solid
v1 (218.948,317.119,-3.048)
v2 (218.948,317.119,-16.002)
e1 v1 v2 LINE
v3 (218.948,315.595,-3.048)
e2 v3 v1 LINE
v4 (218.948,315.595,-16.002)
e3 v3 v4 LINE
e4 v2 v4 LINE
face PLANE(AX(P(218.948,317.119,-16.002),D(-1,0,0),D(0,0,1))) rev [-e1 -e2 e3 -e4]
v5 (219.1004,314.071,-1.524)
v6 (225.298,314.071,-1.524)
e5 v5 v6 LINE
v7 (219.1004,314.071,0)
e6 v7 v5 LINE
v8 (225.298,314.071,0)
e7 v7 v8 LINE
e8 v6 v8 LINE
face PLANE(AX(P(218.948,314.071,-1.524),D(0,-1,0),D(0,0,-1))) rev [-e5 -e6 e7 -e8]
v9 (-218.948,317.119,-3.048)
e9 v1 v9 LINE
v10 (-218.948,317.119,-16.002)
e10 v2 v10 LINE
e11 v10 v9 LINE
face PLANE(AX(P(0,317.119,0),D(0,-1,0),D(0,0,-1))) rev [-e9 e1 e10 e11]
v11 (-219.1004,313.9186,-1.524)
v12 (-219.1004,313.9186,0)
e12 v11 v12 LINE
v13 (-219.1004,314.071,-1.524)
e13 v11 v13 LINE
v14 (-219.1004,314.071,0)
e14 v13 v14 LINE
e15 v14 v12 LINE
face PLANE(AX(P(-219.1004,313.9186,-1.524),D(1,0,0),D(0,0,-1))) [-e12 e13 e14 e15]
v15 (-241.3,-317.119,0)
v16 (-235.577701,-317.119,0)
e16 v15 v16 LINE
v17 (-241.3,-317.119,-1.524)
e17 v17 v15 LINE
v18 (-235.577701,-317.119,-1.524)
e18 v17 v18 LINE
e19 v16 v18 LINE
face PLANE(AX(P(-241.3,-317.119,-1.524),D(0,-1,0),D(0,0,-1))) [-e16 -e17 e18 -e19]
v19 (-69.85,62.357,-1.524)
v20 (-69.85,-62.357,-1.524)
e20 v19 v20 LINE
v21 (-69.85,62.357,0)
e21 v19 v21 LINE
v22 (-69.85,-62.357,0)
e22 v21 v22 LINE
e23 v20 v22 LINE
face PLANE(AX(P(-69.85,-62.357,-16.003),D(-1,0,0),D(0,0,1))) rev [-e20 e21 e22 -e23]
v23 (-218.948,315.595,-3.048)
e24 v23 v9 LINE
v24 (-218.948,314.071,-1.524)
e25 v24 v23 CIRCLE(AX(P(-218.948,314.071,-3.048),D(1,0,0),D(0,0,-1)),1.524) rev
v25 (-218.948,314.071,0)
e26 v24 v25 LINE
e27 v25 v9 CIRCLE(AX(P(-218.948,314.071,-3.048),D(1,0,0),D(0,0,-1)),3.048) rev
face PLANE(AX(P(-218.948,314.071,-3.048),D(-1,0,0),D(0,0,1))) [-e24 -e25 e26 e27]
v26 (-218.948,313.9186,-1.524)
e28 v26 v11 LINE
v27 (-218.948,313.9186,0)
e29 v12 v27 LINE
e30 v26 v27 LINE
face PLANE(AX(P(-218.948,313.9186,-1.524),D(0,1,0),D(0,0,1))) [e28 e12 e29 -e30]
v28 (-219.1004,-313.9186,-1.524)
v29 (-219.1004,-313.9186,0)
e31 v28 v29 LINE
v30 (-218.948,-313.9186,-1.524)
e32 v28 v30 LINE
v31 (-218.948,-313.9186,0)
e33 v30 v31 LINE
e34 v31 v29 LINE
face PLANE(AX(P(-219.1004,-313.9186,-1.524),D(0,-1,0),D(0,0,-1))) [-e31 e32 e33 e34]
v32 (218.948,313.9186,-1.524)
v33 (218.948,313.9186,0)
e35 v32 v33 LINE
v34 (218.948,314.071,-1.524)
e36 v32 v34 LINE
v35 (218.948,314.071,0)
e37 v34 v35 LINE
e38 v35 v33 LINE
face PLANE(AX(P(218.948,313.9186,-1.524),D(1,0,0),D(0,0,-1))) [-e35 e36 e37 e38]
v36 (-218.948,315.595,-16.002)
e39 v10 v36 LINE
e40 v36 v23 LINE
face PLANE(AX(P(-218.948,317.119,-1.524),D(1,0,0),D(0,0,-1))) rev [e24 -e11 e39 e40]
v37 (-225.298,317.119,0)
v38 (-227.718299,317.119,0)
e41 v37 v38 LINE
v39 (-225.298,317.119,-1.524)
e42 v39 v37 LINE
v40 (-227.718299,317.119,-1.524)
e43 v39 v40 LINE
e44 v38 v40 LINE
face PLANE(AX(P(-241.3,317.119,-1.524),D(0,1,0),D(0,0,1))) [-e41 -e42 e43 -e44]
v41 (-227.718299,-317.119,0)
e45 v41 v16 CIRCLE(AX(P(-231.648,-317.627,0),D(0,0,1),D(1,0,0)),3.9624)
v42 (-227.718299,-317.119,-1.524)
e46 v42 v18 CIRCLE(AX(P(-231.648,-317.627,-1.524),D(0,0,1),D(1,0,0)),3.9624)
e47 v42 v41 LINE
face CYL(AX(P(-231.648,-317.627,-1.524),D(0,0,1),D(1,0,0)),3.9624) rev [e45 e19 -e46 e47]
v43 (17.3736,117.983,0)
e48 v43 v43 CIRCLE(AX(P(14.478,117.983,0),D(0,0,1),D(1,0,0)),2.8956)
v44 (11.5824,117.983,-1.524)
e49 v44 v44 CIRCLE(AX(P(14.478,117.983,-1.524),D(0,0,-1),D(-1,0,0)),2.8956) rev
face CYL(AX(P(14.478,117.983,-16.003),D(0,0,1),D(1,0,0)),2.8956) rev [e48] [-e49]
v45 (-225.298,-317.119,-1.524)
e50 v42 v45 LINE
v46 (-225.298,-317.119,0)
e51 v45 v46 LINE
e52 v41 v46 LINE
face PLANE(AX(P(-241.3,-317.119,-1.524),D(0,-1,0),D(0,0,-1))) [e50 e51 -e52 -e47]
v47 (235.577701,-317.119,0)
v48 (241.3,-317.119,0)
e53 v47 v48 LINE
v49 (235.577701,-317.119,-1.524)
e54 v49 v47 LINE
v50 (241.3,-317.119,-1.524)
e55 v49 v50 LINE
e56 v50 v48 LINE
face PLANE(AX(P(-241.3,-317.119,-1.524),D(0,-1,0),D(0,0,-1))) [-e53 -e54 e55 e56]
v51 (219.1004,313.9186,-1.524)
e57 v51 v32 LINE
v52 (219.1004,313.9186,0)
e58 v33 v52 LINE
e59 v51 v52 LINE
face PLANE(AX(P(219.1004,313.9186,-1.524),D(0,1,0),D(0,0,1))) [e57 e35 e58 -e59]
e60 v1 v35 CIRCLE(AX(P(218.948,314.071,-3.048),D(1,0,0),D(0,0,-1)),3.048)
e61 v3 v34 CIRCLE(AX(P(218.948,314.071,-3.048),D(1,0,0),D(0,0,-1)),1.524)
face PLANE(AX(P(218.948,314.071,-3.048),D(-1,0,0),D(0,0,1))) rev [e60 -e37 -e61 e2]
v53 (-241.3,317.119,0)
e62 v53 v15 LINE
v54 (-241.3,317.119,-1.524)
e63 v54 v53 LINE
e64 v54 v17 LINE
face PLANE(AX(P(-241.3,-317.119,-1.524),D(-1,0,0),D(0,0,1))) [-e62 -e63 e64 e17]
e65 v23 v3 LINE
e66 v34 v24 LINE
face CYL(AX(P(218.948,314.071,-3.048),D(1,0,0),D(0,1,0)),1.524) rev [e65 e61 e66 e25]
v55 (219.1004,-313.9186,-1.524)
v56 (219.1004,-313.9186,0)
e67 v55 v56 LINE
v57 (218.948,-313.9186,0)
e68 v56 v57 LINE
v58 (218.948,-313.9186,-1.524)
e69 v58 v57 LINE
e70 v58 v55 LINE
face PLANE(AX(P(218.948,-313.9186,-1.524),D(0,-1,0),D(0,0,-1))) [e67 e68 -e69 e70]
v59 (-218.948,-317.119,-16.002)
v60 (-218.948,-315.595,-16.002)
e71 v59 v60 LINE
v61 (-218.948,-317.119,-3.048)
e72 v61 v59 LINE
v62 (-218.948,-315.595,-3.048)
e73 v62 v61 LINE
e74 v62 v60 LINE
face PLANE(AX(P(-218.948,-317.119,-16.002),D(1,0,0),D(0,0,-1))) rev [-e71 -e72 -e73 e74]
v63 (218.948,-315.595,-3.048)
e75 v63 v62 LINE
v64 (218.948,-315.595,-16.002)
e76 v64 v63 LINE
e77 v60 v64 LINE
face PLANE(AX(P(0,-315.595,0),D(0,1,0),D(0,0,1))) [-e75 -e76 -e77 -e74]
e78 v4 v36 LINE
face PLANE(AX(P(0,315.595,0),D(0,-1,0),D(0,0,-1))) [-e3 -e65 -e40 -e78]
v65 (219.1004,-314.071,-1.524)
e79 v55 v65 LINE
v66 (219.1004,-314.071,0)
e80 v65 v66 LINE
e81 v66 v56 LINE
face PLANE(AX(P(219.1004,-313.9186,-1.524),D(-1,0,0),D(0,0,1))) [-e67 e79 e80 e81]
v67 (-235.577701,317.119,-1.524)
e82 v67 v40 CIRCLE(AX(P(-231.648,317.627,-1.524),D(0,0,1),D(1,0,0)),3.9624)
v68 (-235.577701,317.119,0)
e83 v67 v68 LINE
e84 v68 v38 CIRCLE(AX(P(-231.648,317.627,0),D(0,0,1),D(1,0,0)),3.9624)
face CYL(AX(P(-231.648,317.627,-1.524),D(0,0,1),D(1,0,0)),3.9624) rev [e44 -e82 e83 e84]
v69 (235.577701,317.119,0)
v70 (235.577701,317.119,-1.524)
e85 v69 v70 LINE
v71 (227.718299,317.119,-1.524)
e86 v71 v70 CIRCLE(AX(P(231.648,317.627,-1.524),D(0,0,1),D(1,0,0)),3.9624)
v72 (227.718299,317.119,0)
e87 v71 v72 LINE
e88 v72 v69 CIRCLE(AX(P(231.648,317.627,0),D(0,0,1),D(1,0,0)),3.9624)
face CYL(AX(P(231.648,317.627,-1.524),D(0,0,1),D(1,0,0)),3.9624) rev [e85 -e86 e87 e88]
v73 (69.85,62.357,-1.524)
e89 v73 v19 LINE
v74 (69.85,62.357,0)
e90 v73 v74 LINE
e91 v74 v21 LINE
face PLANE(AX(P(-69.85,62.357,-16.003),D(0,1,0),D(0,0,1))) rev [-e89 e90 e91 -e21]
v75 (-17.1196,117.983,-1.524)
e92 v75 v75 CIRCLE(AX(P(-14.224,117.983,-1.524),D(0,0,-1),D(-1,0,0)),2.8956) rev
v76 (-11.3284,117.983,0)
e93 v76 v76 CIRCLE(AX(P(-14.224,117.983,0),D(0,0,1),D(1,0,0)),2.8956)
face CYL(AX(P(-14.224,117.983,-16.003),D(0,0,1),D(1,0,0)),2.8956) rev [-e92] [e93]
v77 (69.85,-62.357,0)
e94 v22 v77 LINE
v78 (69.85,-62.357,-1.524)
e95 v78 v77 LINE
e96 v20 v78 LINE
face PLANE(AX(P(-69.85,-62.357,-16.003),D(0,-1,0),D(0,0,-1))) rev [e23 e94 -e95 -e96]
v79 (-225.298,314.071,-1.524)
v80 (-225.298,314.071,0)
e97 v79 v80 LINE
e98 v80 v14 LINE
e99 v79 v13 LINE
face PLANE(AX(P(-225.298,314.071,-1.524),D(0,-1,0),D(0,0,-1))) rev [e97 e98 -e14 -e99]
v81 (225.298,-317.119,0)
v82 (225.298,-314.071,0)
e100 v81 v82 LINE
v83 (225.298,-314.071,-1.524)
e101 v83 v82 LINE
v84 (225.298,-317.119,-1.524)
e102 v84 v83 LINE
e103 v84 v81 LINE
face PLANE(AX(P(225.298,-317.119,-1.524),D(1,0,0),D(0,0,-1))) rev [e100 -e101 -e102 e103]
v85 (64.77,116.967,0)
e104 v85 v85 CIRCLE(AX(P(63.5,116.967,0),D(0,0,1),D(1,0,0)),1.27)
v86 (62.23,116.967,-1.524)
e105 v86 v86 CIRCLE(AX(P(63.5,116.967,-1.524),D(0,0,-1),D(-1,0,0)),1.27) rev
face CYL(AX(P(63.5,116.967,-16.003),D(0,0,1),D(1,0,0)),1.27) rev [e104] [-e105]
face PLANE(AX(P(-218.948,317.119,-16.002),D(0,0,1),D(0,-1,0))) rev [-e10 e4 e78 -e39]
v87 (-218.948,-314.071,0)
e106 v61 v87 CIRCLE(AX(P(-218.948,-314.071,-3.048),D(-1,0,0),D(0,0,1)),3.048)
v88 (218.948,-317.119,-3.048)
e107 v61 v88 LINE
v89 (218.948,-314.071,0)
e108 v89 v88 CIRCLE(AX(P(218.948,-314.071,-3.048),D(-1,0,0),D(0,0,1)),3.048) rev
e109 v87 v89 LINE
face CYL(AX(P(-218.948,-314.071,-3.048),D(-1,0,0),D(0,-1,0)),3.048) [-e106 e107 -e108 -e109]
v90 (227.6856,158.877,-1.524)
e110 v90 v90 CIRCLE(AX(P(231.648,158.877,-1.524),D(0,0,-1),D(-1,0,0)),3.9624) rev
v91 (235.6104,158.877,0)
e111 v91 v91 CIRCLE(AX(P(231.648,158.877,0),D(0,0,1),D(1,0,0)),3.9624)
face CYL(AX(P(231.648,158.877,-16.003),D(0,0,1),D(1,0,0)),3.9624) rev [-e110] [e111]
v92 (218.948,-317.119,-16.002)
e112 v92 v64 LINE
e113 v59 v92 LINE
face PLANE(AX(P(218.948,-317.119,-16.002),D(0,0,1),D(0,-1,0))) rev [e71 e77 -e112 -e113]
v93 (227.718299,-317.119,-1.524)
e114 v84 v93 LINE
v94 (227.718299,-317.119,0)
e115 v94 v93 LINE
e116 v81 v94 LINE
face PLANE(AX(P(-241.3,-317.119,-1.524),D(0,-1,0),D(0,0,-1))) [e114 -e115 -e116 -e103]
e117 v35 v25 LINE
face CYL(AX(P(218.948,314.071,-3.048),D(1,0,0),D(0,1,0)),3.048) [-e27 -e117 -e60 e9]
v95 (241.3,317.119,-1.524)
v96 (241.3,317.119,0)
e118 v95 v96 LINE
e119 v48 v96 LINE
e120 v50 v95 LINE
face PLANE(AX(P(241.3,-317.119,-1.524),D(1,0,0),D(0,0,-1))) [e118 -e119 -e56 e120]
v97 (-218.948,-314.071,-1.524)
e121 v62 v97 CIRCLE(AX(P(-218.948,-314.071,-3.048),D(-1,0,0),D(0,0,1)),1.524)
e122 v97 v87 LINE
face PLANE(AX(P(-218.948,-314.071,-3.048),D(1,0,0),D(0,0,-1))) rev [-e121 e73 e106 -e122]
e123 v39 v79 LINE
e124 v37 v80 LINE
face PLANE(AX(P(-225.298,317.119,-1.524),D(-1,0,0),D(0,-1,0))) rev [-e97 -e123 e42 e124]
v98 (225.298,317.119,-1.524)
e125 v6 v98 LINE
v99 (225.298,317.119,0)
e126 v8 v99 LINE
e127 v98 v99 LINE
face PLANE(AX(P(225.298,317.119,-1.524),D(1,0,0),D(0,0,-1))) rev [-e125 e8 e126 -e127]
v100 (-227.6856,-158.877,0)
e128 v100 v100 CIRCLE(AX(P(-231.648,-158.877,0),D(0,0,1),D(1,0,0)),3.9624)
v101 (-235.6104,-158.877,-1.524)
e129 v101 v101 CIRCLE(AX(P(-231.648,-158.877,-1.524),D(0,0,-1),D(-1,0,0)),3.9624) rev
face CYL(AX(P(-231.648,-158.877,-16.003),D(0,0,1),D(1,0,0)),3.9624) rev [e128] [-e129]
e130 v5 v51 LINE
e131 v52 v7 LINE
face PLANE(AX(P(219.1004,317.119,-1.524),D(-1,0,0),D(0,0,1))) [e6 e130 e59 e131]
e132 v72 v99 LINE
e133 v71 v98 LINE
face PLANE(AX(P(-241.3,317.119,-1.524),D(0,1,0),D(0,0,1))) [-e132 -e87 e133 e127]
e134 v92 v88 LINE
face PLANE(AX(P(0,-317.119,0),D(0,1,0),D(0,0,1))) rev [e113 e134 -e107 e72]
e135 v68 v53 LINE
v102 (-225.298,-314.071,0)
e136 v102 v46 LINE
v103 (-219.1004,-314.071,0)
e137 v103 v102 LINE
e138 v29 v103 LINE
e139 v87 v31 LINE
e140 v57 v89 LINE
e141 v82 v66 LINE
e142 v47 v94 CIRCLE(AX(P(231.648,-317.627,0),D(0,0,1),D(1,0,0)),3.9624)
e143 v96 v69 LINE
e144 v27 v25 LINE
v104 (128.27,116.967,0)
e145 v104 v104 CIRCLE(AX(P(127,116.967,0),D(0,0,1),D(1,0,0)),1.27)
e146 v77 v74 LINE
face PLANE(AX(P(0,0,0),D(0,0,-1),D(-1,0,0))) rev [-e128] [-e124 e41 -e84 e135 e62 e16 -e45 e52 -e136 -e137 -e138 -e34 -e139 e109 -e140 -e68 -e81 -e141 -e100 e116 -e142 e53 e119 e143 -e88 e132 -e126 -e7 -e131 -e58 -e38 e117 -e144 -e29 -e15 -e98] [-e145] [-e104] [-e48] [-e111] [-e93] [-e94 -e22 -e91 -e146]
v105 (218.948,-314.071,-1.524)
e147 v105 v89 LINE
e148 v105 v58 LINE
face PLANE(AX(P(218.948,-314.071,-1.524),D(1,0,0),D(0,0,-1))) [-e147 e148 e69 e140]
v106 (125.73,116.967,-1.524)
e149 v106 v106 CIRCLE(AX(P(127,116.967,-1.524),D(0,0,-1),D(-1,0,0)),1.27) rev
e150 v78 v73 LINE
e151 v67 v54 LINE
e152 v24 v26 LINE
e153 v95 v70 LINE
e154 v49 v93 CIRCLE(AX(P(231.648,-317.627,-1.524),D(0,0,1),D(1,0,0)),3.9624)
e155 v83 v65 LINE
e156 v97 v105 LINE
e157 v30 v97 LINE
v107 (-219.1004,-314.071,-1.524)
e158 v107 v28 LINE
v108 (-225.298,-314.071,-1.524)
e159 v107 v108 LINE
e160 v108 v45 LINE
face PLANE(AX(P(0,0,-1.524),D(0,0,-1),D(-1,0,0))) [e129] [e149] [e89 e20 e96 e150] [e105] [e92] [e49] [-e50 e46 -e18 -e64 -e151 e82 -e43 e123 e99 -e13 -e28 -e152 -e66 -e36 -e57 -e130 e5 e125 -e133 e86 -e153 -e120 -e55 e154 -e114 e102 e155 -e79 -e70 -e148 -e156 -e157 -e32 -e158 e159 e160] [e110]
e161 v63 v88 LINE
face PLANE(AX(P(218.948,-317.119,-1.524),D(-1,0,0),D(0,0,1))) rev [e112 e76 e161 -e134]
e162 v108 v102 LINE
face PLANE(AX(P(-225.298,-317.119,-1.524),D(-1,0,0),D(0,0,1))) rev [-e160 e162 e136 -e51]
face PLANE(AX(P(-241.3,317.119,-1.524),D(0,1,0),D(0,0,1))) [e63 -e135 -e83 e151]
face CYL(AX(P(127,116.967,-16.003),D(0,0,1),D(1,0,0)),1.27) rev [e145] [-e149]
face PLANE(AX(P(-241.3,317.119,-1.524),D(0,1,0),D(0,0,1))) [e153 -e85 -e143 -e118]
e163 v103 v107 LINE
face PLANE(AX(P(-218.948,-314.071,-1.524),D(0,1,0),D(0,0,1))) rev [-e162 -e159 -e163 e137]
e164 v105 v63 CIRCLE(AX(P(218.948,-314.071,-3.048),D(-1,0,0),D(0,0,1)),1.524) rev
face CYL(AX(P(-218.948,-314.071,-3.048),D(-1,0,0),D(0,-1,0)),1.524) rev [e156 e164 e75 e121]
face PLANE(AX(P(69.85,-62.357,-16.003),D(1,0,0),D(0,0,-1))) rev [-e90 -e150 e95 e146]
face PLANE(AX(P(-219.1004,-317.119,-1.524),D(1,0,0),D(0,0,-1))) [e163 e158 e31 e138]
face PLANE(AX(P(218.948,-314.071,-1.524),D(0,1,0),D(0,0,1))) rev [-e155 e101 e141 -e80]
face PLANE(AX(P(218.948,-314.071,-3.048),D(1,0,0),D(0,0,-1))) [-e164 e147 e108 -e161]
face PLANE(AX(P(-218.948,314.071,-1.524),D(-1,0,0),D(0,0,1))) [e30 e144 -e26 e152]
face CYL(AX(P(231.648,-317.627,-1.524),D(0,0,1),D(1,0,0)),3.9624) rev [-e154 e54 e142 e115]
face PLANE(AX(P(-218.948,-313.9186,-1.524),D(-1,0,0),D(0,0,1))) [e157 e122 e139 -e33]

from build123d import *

# Parameters (mm, degrees)
CROQUIS1_W                   = 482.6
CROQUIS1_H                   = 634.238
BRIDA_BASE1_DEPTH            = 1.524
CROQUIS6_R                   = 3.9624
CROQUIS6_W                   = 6.35
CROQUIS6_H                   = 3.048
CORTAR_EXTRUIR1_DEPTH        = 399.487732229
BRIDA_START                  = -218.948
BRIDA_DE_ARISTA1_DEPTH       = 437.896
BRIDA_START_2                = -219.1004
BRIDA_DE_ARISTA1_2_OUTLINE_W = 0.1524
BRIDA_DE_ARISTA1_2_OUTLINE_H = 1.524
BRIDA_DE_ARISTA1_2_DEPTH     = 0.1524
BRIDA_START_3                = 218.948
BRIDA_DE_ARISTA1_3_OUTLINE_W = 0.1524
BRIDA_DE_ARISTA1_3_OUTLINE_H = 1.524
BRIDA_DE_ARISTA1_3_DEPTH     = 0.1524
BRIDA_DE_ARISTA1_4_DEPTH     = 437.896
CORTAR_EXTRUIR2_REACH        = 400.806
CROQUIS13_R                  = 3.9624
CROQUIS13_R_2                = 2.8956
CROQUIS13_R_3                = 1.27
CROQUIS13_W                  = 139.7
CROQUIS13_H                  = 124.714


# Read off the part's stored shape, not the designer's step: Brida de arista1
# Sheet-metal steps are written as plain solids
with BuildPart() as part:
    # Croquis1 → Brida base1 (new body)
    with BuildSketch(Plane.XY):
        Rectangle(CROQUIS1_W, CROQUIS1_H)
    extrude(amount=-BRIDA_BASE1_DEPTH)

    # Croquis6 → Cortar-Extruir1 (cut, through all)
    with BuildSketch(Plane.XY):
        with Locations((231.648, 317.627)):
            Circle(CROQUIS6_R)
        with Locations((-231.648, 317.627)):
            Circle(CROQUIS6_R)
        with Locations((-231.648, -317.627)):
            Circle(CROQUIS6_R)
        with Locations((231.648, -317.627)):
            Circle(CROQUIS6_R)
        with Locations((-222.123, 315.595)):
            Rectangle(CROQUIS6_W, CROQUIS6_H)
        with Locations((222.123, 315.595)):
            Rectangle(CROQUIS6_W, CROQUIS6_H)
        with Locations((-222.123, -315.595)):
            Rectangle(CROQUIS6_W, CROQUIS6_H)
        with Locations((222.123, -315.595)):
            Rectangle(CROQUIS6_W, CROQUIS6_H)
    extrude(amount=-CORTAR_EXTRUIR1_DEPTH, mode=Mode.SUBTRACT)

    # Brida de arista1 outline → Brida de arista1 (cut)
    with BuildSketch(Plane.YZ.offset(BRIDA_START)):
        with BuildLine():
            ThreePointArc((-316.710645431, -1.524), (-315.595, -0.408354569), (-314.071, 0))
            Line((-314.071, 0), (-317.119, 0))
            Line((-317.119, 0), (-317.119, -1.524))
            Line((-317.119, -1.524), (-316.710645431, -1.524))
        make_face()
        with BuildLine():
            Line((317.119, 0), (314.071, 0))
            ThreePointArc((314.071, 0), (315.595, -0.408354569), (316.710645431, -1.524))
            Line((316.710645431, -1.524), (317.119, -1.524))
            Line((317.119, -1.524), (317.119, 0))
        make_face()
    extrude(amount=BRIDA_DE_ARISTA1_DEPTH, mode=Mode.SUBTRACT)

    # Brida de arista1 2 outline → Brida de arista1 2 (cut)
    with BuildSketch(Plane.YZ.offset(BRIDA_START_2)):
        with Locations((-313.9948, -0.762)):
            Rectangle(BRIDA_DE_ARISTA1_2_OUTLINE_W, BRIDA_DE_ARISTA1_2_OUTLINE_H)
        with Locations((313.9948, -0.762)):
            Rectangle(BRIDA_DE_ARISTA1_2_OUTLINE_W, BRIDA_DE_ARISTA1_2_OUTLINE_H)
    extrude(amount=BRIDA_DE_ARISTA1_2_DEPTH, mode=Mode.SUBTRACT)

    # Brida de arista1 3 outline → Brida de arista1 3 (cut)
    with BuildSketch(Plane.YZ.offset(BRIDA_START_3)):
        with Locations((-313.9948, -0.762)):
            Rectangle(BRIDA_DE_ARISTA1_3_OUTLINE_W, BRIDA_DE_ARISTA1_3_OUTLINE_H)
        with Locations((313.9948, -0.762)):
            Rectangle(BRIDA_DE_ARISTA1_3_OUTLINE_W, BRIDA_DE_ARISTA1_3_OUTLINE_H)
    extrude(amount=BRIDA_DE_ARISTA1_3_DEPTH, mode=Mode.SUBTRACT)

    # Brida de arista1 4 outline → Brida de arista1 4 (add)
    with BuildSketch(Plane.YZ.offset(BRIDA_START)):
        with BuildLine():
            ThreePointArc((-315.595, -3.048), (-315.148630735, -1.970369265), (-314.071, -1.524))
            Line((-314.071, -1.524), (-316.710645431, -1.524))
            ThreePointArc((-316.710645431, -1.524), (-317.015141918, -2.259119551), (-317.119, -3.048))
            Line((-317.119, -3.048), (-317.119, -16.002))
            Line((-317.119, -16.002), (-315.595, -16.002))
            Line((-315.595, -16.002), (-315.595, -3.048))
        make_face()
        with BuildLine():
            Line((316.710645431, -1.524), (314.071, -1.524))
            ThreePointArc((314.071, -1.524), (315.148630735, -1.970369265), (315.595, -3.048))
            Line((315.595, -3.048), (315.595, -16.002))
            Line((315.595, -16.002), (317.119, -16.002))
            Line((317.119, -16.002), (317.119, -3.048))
            ThreePointArc((317.119, -3.048), (317.015141918, -2.259119551), (316.710645431, -1.524))
        make_face()
    extrude(amount=BRIDA_DE_ARISTA1_4_DEPTH)

    # Croquis13 → Cortar-Extruir2 (cut, up to next)
    with BuildSketch(Plane.XY, mode=Mode.PRIVATE) as cortar_extruir2_sk1:
        with Locations((-231.648, -158.877)):
            Circle(CROQUIS13_R)
    cortar_extruir2_tool1 = extrude(cortar_extruir2_sk1.sketch, amount=-CORTAR_EXTRUIR2_REACH, mode=Mode.PRIVATE) & part.part
    # Croquis13 → Cortar-Extruir2 (cut, up to next)
    with BuildSketch(Plane.XY, mode=Mode.PRIVATE) as cortar_extruir2_sk2:
        with Locations((231.648, 158.877)):
            Circle(CROQUIS13_R)
    cortar_extruir2_tool2 = extrude(cortar_extruir2_sk2.sketch, amount=-CORTAR_EXTRUIR2_REACH, mode=Mode.PRIVATE) & part.part
    # Croquis13 → Cortar-Extruir2 (cut, up to next)
    with BuildSketch(Plane.XY, mode=Mode.PRIVATE) as cortar_extruir2_sk3:
        with Locations((-14.224, 117.983)):
            Circle(CROQUIS13_R_2)
    cortar_extruir2_tool3 = extrude(cortar_extruir2_sk3.sketch, amount=-CORTAR_EXTRUIR2_REACH, mode=Mode.PRIVATE) & part.part
    # Croquis13 → Cortar-Extruir2 (cut, up to next)
    with BuildSketch(Plane.XY, mode=Mode.PRIVATE) as cortar_extruir2_sk4:
        with Locations((63.5, 116.967)):
            Circle(CROQUIS13_R_3)
    cortar_extruir2_tool4 = extrude(cortar_extruir2_sk4.sketch, amount=-CORTAR_EXTRUIR2_REACH, mode=Mode.PRIVATE) & part.part
    # Croquis13 → Cortar-Extruir2 (cut, up to next)
    with BuildSketch(Plane.XY, mode=Mode.PRIVATE) as cortar_extruir2_sk5:
        with Locations((14.478, 117.983)):
            Circle(CROQUIS13_R_2)
    cortar_extruir2_tool5 = extrude(cortar_extruir2_sk5.sketch, amount=-CORTAR_EXTRUIR2_REACH, mode=Mode.PRIVATE) & part.part
    # Croquis13 → Cortar-Extruir2 (cut, up to next)
    with BuildSketch(Plane.XY, mode=Mode.PRIVATE) as cortar_extruir2_sk6:
        with Locations((127, 116.967)):
            Circle(CROQUIS13_R_3)
    cortar_extruir2_tool6 = extrude(cortar_extruir2_sk6.sketch, amount=-CORTAR_EXTRUIR2_REACH, mode=Mode.PRIVATE) & part.part
    # Croquis13 → Cortar-Extruir2 (cut, up to next)
    with BuildSketch(Plane.XY, mode=Mode.PRIVATE) as cortar_extruir2_sk7:
        Rectangle(CROQUIS13_W, CROQUIS13_H)
    cortar_extruir2_tool7 = extrude(cortar_extruir2_sk7.sketch, amount=-CORTAR_EXTRUIR2_REACH, mode=Mode.PRIVATE) & part.part
    add(cortar_extruir2_tool1.solids().sort_by_distance((-231.648, -158.877, 0))[0], mode=Mode.SUBTRACT)
    add(cortar_extruir2_tool2.solids().sort_by_distance((231.648, 158.877, 0))[0], mode=Mode.SUBTRACT)
    add(cortar_extruir2_tool3.solids().sort_by_distance((-14.224, 117.983, 0))[0], mode=Mode.SUBTRACT)
    add(cortar_extruir2_tool4.solids().sort_by_distance((63.5, 116.967, 0))[0], mode=Mode.SUBTRACT)
    add(cortar_extruir2_tool5.solids().sort_by_distance((14.478, 117.983, 0))[0], mode=Mode.SUBTRACT)
    add(cortar_extruir2_tool6.solids().sort_by_distance((127, 116.967, 0))[0], mode=Mode.SUBTRACT)
    add(cortar_extruir2_tool7.solids().sort_by_distance((0, 0, 0))[0], mode=Mode.SUBTRACT)


solid = part.part
